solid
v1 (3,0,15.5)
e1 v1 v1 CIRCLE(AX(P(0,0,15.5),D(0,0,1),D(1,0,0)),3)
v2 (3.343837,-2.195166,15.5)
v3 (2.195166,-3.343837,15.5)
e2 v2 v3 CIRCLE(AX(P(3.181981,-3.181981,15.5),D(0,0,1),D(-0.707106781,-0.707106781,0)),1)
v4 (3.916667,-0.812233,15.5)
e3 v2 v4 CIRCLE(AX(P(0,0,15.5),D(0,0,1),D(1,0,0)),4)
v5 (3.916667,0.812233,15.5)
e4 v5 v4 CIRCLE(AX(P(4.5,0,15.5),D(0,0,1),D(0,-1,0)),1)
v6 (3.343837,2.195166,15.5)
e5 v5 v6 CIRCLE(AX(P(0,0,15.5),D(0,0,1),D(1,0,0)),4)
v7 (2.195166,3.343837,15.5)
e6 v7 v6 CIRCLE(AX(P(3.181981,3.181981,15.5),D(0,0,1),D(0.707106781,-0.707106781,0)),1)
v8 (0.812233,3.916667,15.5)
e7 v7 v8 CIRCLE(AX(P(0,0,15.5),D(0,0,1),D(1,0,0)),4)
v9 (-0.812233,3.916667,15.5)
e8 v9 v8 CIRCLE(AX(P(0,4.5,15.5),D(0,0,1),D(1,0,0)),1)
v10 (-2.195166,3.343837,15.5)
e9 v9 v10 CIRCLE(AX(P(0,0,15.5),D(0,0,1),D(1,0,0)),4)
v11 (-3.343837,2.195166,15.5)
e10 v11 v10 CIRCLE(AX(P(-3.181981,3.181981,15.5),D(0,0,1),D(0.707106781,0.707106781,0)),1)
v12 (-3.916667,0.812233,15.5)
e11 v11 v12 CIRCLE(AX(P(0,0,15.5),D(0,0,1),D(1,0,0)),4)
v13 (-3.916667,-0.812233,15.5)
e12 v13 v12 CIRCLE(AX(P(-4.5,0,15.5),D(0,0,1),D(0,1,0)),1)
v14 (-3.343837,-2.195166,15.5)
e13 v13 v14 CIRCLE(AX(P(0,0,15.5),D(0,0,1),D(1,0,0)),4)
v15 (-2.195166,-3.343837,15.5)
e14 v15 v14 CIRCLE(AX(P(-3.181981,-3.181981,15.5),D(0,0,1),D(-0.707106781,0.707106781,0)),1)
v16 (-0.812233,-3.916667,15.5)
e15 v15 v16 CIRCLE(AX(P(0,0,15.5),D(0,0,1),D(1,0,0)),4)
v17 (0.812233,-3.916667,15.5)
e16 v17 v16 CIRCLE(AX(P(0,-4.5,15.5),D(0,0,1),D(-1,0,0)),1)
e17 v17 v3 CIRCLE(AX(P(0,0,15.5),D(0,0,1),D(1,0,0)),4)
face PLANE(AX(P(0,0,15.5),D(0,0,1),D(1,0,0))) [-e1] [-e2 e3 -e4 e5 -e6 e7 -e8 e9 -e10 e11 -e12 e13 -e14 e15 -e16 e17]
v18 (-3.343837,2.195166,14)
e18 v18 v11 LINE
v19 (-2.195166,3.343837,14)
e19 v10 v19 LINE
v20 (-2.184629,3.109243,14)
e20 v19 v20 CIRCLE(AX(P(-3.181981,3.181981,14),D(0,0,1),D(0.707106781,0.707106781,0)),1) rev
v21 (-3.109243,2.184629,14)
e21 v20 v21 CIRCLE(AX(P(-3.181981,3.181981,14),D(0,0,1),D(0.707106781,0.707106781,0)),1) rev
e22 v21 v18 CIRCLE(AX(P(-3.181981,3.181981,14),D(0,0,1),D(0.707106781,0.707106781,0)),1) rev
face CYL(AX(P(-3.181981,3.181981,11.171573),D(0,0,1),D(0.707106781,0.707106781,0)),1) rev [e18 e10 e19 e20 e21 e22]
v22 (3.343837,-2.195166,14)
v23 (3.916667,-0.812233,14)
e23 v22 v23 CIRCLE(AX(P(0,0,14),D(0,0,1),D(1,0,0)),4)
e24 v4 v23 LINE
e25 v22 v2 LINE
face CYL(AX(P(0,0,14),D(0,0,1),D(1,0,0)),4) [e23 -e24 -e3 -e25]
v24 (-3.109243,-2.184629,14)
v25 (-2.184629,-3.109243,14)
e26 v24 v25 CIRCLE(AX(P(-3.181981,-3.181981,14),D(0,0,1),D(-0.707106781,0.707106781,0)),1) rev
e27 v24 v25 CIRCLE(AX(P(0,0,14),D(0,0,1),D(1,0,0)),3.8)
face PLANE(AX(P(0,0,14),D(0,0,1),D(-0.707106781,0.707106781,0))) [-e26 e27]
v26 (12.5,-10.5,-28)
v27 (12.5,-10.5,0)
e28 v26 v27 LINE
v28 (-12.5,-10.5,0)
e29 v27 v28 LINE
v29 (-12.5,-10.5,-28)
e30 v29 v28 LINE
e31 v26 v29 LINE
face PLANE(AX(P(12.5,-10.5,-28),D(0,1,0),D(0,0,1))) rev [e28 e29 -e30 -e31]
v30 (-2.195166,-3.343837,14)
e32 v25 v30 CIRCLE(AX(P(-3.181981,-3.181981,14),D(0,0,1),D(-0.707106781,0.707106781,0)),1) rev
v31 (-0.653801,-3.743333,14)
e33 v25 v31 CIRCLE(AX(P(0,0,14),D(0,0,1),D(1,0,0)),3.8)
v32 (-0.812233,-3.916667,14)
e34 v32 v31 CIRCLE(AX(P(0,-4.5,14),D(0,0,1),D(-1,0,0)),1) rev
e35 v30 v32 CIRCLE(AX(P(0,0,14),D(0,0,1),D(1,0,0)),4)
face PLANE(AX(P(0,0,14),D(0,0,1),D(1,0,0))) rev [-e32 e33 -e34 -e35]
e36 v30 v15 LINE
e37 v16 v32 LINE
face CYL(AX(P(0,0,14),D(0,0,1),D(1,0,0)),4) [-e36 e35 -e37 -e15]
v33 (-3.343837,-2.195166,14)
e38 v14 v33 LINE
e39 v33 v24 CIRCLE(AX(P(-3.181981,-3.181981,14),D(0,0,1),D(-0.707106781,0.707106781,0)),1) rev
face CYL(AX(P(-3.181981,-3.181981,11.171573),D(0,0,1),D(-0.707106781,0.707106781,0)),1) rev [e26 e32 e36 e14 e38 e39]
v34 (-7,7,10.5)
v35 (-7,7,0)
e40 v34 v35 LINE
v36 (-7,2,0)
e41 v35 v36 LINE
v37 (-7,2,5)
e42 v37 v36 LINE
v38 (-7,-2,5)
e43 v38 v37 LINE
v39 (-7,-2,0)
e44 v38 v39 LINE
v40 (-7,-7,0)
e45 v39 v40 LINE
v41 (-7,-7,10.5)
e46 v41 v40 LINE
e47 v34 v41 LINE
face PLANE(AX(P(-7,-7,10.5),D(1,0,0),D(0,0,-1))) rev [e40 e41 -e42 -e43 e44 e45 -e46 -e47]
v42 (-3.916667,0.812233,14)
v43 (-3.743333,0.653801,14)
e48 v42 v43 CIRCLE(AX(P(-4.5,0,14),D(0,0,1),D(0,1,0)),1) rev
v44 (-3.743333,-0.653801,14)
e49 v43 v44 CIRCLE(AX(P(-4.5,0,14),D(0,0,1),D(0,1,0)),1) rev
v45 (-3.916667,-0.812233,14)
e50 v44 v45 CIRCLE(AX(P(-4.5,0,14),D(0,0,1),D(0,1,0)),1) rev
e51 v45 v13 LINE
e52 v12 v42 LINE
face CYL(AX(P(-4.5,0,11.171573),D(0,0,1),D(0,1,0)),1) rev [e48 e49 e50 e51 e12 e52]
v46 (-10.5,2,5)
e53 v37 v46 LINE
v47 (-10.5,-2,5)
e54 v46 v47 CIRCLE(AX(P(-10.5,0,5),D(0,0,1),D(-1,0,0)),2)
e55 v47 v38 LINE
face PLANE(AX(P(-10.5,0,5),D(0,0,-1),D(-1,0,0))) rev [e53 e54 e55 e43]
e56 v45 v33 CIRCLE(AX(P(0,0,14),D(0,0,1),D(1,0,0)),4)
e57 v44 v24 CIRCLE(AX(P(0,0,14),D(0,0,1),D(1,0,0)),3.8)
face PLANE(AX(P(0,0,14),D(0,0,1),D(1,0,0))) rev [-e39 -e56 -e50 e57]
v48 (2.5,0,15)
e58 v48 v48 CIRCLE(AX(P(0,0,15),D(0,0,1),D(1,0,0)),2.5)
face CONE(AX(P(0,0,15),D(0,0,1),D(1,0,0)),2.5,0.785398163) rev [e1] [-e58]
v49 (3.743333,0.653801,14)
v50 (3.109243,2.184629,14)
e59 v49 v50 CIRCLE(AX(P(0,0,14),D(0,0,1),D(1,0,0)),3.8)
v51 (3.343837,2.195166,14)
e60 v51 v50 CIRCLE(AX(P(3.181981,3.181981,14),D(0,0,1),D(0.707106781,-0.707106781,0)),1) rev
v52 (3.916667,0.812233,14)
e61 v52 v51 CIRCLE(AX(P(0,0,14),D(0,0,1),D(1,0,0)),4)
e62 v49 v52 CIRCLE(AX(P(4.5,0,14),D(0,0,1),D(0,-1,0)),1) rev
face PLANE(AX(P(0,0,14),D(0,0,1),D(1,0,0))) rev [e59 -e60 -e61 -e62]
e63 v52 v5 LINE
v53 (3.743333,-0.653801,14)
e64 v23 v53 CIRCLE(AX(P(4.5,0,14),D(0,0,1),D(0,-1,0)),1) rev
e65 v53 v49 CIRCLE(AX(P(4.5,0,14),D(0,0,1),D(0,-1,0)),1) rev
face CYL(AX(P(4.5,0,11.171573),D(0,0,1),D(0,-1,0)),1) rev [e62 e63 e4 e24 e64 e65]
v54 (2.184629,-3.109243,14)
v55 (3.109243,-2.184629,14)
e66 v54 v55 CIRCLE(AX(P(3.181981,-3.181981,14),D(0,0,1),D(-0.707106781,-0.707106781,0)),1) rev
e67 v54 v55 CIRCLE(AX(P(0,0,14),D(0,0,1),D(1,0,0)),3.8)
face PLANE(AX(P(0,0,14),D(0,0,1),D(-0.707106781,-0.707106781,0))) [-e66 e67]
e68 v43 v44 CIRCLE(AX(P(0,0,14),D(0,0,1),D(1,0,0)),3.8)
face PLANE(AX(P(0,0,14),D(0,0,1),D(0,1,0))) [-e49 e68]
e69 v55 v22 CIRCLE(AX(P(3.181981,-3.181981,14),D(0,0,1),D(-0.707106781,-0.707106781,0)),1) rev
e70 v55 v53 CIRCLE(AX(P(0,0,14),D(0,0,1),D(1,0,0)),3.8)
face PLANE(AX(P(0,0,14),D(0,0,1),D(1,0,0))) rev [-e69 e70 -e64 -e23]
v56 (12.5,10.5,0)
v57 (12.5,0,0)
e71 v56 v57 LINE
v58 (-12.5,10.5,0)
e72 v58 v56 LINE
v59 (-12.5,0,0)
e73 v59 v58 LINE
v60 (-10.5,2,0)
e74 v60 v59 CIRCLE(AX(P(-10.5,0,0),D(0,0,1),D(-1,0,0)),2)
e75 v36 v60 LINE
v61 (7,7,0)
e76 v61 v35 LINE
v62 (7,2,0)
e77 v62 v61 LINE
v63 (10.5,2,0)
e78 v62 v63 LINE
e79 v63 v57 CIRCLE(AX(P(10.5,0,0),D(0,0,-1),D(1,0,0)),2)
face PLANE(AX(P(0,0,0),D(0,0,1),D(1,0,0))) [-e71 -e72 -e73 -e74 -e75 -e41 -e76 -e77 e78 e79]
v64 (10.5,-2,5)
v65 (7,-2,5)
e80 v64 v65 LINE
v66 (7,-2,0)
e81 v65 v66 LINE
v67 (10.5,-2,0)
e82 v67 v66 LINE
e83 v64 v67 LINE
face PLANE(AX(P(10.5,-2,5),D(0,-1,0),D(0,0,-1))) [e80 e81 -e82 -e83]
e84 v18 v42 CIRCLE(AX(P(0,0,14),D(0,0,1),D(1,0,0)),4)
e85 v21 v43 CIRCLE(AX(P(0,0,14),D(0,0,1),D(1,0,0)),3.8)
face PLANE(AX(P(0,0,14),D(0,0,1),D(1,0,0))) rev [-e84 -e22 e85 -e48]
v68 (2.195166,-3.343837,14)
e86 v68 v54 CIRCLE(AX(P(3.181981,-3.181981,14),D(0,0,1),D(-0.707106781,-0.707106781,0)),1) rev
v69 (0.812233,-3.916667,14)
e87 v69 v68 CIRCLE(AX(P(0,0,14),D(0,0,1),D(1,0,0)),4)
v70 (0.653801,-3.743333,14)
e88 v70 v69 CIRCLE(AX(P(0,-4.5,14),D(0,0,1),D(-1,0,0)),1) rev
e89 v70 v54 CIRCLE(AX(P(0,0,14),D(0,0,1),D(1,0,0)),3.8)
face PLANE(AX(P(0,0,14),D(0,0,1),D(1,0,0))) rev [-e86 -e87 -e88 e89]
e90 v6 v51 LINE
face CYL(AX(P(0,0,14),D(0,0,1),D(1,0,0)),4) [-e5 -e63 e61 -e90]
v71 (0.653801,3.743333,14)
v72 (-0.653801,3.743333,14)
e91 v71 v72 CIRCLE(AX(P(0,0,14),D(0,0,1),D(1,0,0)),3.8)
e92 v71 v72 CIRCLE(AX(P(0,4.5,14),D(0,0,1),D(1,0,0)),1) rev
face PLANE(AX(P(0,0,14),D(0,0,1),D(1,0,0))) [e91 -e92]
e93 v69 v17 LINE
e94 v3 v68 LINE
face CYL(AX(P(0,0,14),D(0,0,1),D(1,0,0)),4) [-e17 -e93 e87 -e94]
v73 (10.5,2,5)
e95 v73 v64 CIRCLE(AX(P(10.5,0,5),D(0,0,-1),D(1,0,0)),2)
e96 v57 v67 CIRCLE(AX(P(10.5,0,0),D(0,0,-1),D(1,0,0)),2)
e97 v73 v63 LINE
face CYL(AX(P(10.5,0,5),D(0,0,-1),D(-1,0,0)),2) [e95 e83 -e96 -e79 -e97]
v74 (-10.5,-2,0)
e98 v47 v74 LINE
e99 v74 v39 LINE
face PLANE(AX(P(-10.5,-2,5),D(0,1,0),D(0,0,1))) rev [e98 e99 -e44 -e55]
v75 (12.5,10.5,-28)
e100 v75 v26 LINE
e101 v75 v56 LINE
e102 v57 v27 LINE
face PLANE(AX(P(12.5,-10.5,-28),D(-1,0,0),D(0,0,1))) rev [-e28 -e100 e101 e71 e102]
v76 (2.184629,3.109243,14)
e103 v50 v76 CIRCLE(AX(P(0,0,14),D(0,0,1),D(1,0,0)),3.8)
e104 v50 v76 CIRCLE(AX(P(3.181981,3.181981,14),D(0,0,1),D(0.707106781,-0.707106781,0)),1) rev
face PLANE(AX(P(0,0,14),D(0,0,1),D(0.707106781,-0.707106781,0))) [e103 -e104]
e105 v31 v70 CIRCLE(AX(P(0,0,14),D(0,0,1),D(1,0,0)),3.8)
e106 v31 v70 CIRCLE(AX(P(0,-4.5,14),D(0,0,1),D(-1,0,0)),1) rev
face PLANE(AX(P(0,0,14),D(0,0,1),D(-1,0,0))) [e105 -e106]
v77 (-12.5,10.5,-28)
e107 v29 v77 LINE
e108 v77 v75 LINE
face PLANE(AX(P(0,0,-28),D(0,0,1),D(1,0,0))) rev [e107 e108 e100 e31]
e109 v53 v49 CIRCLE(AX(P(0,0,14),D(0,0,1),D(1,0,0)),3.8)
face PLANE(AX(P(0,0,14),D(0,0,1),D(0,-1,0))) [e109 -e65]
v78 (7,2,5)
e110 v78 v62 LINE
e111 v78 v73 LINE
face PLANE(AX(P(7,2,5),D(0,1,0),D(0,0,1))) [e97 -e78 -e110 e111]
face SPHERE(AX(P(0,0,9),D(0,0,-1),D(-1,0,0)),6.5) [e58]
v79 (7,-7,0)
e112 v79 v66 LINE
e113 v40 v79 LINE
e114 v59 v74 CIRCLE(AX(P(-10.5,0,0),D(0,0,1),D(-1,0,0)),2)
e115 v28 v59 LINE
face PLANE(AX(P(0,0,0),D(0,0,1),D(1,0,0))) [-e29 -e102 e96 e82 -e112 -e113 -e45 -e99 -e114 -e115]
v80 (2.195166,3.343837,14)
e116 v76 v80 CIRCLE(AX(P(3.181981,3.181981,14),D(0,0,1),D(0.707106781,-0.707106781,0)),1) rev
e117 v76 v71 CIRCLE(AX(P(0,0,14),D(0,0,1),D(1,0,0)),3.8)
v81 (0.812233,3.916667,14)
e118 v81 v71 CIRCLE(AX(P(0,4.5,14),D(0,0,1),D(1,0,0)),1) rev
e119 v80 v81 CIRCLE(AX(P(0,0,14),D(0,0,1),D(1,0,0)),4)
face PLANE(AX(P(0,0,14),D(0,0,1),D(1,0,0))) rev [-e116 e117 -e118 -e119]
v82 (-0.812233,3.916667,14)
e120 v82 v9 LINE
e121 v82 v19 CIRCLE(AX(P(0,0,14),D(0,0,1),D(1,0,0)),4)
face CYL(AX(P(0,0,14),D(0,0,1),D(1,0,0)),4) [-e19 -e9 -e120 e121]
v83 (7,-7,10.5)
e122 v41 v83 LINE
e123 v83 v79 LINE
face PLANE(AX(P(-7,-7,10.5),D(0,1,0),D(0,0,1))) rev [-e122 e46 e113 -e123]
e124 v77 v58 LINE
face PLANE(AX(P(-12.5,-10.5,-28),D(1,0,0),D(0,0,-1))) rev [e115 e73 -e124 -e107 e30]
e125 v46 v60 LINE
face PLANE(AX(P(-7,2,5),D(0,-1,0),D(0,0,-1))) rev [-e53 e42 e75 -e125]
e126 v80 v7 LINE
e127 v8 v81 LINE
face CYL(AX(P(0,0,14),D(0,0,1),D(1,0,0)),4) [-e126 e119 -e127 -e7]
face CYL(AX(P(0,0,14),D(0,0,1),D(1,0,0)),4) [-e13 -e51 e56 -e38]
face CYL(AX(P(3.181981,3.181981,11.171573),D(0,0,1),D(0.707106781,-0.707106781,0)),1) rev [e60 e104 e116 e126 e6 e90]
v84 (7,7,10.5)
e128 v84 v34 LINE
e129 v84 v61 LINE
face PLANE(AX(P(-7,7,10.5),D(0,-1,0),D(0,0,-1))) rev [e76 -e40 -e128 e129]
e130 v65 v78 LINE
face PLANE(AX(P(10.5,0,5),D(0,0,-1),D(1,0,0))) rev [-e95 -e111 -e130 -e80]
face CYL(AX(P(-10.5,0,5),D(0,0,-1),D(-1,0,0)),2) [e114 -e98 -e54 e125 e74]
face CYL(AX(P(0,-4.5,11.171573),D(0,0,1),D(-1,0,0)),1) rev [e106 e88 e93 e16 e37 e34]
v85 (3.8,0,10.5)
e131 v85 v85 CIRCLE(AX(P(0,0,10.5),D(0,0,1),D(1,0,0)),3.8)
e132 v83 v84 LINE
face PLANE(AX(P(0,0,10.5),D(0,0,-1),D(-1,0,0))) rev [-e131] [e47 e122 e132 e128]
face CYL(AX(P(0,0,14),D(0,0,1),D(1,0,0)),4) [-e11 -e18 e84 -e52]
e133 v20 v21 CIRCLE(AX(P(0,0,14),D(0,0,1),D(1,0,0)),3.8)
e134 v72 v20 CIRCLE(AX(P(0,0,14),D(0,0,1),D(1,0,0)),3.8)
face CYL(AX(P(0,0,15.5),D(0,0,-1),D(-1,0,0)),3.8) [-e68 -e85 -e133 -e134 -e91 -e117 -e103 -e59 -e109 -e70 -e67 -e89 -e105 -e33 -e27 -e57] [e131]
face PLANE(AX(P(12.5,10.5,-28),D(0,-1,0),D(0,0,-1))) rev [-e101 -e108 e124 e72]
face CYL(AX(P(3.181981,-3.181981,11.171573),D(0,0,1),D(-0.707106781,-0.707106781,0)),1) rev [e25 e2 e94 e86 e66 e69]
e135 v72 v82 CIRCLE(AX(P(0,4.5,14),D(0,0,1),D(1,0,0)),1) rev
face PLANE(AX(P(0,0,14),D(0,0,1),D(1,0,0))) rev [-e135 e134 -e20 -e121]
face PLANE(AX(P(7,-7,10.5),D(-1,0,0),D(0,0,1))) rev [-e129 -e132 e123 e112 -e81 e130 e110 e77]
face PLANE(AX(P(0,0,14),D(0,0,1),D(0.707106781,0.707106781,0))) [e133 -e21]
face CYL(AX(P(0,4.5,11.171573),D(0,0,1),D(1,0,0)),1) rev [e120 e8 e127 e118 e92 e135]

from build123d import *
from build123d.topology import SkipClean

# Parameters (mm, degrees)
SKETCH_1_W               = 14
SKETCH_1_H               = 14
EXTRUDE_1_DEPTH          = 10.5
SKETCH_2_R               = 3.8
EXTRUDE_2_DEPTH          = 5
SKETCH_3_R               = 4
EXTRUDE_3_DEPTH          = 1.5
SKETCH_4_R               = 1
CUT_EXTRUDE_2_DEPTH      = 1.5
PATTERN_CIRCULAR_1_COUNT = 8
SKETCH_5_W               = 25
SKETCH_5_H               = 21
EXTRUDE_4_DEPTH          = 28
EXTRUDE_5_DEPTH          = 5
SKETCH_9_R               = 3
CUT_EXTRUDE_3_DEPTH      = 0.5
CHAMFER_1_SIZE           = 0.5


with BuildPart() as part:
    # 草圖1 → 填料-伸長1 (new body)
    with BuildSketch(Plane.XY):
        Rectangle(SKETCH_1_W, SKETCH_1_H)
    extrude(amount=EXTRUDE_1_DEPTH)

    # 草圖2 → 填料-伸長2 (add)
    with BuildSketch(Plane.XY.offset(10.5)):
        Circle(SKETCH_2_R)
    extrude(amount=EXTRUDE_2_DEPTH)

    # 草圖3 → 填料-伸長3 (add)
    with BuildSketch(Plane.XY.offset(15.5)):
        Circle(SKETCH_3_R)
    extrude(amount=-EXTRUDE_3_DEPTH)

    # 草圖4 → 除料-伸長2 (cut)
    with BuildSketch(Plane.XY.offset(15.5)):
        with Locations((0, 4.5)):
            Circle(SKETCH_4_R)
    cut_extrude_2 = extrude(amount=-CUT_EXTRUDE_2_DEPTH, mode=Mode.SUBTRACT)

    # 環狀複製排列1: 除料-伸長2 ×8 about axis
    pattern_circular_1_axis = Axis((0, 0, 0), (0, 0, 1))
    for i in range(1, PATTERN_CIRCULAR_1_COUNT):
        add(cut_extrude_2.rotate(pattern_circular_1_axis, i * 360 / PATTERN_CIRCULAR_1_COUNT), mode=Mode.SUBTRACT)

    # 草圖5 → 填料-伸長4 (add)
    with BuildSketch(Plane(origin=(0, 0, 0), x_dir=(-1, 0, 0), z_dir=(0, 0, -1))):
        Rectangle(SKETCH_5_W, SKETCH_5_H)
    extrude(amount=EXTRUDE_4_DEPTH)

    # 草圖6 → 填料-伸長5 (add)
    with BuildSketch(Plane.XY):
        with BuildLine():
            Line((-7, -2), (-7, 2))
            Line((-7, 2), (-10.5, 2))
            ThreePointArc((-10.5, 2), (-12.5, 0), (-10.5, -2))
            Line((-10.5, -2), (-7, -2))
        make_face()
    extrude_5 = extrude(amount=EXTRUDE_5_DEPTH)

    # 鏡射1: 填料-伸長5 across plane
    add(extrude_5.mirror(Plane(origin=(0, 0, 0), x_dir=(0, 0, 1), z_dir=(1, 0, 0))))

    # 草圖9 → 除料-伸長3 (cut)
    with BuildSketch(Plane.XY.offset(15.5)):
        Circle(SKETCH_9_R)
    extrude(amount=-CUT_EXTRUDE_3_DEPTH, mode=Mode.SUBTRACT)

    # 導角1
    chamfer_1_edges = [part.edges().sort_by_distance(p)[0] for p in [
        (-3, 0, 15),
    ]]
    chamfer(chamfer_1_edges, length=CHAMFER_1_SIZE - 0.0001)  # a hair under: the kernel refuses the full size

    # 草圖10 → 旋轉2 (revolve)
    with SkipClean():  # the faces are left unmerged after this step: merging them gives an invalid solid
        with BuildSketch(Plane(origin=(0, 0, 0), x_dir=(1, 0, 0), z_dir=(0, 1, 0)), mode=Mode.PRIVATE) as revolve_2_sk:
            with BuildLine():
                Line((2.5, -15), (0, -15))
                Line((0, -15), (0, -15.5))
                ThreePointArc((0, -15.5), (1.274754878, -15.373774392), (2.5, -15))
            make_face()
            with BuildLine():
                Line((0, -15.5), (0, -15))
                Line((0, -15), (-2.5, -15))
                ThreePointArc((-2.5, -15), (-1.274754878, -15.373774392), (0, -15.5))
            make_face()
        revolve(revolve_2_sk.sketch.rotate(Axis((0, 0, 0), (0, 0, 1)), 170.092802055), axis=Axis((0, 0, 0), (0, 0, 1)))
    add(part.part.scale(1), mode=Mode.REPLACE)  # the faces are merged on a copy


solid = part.part
